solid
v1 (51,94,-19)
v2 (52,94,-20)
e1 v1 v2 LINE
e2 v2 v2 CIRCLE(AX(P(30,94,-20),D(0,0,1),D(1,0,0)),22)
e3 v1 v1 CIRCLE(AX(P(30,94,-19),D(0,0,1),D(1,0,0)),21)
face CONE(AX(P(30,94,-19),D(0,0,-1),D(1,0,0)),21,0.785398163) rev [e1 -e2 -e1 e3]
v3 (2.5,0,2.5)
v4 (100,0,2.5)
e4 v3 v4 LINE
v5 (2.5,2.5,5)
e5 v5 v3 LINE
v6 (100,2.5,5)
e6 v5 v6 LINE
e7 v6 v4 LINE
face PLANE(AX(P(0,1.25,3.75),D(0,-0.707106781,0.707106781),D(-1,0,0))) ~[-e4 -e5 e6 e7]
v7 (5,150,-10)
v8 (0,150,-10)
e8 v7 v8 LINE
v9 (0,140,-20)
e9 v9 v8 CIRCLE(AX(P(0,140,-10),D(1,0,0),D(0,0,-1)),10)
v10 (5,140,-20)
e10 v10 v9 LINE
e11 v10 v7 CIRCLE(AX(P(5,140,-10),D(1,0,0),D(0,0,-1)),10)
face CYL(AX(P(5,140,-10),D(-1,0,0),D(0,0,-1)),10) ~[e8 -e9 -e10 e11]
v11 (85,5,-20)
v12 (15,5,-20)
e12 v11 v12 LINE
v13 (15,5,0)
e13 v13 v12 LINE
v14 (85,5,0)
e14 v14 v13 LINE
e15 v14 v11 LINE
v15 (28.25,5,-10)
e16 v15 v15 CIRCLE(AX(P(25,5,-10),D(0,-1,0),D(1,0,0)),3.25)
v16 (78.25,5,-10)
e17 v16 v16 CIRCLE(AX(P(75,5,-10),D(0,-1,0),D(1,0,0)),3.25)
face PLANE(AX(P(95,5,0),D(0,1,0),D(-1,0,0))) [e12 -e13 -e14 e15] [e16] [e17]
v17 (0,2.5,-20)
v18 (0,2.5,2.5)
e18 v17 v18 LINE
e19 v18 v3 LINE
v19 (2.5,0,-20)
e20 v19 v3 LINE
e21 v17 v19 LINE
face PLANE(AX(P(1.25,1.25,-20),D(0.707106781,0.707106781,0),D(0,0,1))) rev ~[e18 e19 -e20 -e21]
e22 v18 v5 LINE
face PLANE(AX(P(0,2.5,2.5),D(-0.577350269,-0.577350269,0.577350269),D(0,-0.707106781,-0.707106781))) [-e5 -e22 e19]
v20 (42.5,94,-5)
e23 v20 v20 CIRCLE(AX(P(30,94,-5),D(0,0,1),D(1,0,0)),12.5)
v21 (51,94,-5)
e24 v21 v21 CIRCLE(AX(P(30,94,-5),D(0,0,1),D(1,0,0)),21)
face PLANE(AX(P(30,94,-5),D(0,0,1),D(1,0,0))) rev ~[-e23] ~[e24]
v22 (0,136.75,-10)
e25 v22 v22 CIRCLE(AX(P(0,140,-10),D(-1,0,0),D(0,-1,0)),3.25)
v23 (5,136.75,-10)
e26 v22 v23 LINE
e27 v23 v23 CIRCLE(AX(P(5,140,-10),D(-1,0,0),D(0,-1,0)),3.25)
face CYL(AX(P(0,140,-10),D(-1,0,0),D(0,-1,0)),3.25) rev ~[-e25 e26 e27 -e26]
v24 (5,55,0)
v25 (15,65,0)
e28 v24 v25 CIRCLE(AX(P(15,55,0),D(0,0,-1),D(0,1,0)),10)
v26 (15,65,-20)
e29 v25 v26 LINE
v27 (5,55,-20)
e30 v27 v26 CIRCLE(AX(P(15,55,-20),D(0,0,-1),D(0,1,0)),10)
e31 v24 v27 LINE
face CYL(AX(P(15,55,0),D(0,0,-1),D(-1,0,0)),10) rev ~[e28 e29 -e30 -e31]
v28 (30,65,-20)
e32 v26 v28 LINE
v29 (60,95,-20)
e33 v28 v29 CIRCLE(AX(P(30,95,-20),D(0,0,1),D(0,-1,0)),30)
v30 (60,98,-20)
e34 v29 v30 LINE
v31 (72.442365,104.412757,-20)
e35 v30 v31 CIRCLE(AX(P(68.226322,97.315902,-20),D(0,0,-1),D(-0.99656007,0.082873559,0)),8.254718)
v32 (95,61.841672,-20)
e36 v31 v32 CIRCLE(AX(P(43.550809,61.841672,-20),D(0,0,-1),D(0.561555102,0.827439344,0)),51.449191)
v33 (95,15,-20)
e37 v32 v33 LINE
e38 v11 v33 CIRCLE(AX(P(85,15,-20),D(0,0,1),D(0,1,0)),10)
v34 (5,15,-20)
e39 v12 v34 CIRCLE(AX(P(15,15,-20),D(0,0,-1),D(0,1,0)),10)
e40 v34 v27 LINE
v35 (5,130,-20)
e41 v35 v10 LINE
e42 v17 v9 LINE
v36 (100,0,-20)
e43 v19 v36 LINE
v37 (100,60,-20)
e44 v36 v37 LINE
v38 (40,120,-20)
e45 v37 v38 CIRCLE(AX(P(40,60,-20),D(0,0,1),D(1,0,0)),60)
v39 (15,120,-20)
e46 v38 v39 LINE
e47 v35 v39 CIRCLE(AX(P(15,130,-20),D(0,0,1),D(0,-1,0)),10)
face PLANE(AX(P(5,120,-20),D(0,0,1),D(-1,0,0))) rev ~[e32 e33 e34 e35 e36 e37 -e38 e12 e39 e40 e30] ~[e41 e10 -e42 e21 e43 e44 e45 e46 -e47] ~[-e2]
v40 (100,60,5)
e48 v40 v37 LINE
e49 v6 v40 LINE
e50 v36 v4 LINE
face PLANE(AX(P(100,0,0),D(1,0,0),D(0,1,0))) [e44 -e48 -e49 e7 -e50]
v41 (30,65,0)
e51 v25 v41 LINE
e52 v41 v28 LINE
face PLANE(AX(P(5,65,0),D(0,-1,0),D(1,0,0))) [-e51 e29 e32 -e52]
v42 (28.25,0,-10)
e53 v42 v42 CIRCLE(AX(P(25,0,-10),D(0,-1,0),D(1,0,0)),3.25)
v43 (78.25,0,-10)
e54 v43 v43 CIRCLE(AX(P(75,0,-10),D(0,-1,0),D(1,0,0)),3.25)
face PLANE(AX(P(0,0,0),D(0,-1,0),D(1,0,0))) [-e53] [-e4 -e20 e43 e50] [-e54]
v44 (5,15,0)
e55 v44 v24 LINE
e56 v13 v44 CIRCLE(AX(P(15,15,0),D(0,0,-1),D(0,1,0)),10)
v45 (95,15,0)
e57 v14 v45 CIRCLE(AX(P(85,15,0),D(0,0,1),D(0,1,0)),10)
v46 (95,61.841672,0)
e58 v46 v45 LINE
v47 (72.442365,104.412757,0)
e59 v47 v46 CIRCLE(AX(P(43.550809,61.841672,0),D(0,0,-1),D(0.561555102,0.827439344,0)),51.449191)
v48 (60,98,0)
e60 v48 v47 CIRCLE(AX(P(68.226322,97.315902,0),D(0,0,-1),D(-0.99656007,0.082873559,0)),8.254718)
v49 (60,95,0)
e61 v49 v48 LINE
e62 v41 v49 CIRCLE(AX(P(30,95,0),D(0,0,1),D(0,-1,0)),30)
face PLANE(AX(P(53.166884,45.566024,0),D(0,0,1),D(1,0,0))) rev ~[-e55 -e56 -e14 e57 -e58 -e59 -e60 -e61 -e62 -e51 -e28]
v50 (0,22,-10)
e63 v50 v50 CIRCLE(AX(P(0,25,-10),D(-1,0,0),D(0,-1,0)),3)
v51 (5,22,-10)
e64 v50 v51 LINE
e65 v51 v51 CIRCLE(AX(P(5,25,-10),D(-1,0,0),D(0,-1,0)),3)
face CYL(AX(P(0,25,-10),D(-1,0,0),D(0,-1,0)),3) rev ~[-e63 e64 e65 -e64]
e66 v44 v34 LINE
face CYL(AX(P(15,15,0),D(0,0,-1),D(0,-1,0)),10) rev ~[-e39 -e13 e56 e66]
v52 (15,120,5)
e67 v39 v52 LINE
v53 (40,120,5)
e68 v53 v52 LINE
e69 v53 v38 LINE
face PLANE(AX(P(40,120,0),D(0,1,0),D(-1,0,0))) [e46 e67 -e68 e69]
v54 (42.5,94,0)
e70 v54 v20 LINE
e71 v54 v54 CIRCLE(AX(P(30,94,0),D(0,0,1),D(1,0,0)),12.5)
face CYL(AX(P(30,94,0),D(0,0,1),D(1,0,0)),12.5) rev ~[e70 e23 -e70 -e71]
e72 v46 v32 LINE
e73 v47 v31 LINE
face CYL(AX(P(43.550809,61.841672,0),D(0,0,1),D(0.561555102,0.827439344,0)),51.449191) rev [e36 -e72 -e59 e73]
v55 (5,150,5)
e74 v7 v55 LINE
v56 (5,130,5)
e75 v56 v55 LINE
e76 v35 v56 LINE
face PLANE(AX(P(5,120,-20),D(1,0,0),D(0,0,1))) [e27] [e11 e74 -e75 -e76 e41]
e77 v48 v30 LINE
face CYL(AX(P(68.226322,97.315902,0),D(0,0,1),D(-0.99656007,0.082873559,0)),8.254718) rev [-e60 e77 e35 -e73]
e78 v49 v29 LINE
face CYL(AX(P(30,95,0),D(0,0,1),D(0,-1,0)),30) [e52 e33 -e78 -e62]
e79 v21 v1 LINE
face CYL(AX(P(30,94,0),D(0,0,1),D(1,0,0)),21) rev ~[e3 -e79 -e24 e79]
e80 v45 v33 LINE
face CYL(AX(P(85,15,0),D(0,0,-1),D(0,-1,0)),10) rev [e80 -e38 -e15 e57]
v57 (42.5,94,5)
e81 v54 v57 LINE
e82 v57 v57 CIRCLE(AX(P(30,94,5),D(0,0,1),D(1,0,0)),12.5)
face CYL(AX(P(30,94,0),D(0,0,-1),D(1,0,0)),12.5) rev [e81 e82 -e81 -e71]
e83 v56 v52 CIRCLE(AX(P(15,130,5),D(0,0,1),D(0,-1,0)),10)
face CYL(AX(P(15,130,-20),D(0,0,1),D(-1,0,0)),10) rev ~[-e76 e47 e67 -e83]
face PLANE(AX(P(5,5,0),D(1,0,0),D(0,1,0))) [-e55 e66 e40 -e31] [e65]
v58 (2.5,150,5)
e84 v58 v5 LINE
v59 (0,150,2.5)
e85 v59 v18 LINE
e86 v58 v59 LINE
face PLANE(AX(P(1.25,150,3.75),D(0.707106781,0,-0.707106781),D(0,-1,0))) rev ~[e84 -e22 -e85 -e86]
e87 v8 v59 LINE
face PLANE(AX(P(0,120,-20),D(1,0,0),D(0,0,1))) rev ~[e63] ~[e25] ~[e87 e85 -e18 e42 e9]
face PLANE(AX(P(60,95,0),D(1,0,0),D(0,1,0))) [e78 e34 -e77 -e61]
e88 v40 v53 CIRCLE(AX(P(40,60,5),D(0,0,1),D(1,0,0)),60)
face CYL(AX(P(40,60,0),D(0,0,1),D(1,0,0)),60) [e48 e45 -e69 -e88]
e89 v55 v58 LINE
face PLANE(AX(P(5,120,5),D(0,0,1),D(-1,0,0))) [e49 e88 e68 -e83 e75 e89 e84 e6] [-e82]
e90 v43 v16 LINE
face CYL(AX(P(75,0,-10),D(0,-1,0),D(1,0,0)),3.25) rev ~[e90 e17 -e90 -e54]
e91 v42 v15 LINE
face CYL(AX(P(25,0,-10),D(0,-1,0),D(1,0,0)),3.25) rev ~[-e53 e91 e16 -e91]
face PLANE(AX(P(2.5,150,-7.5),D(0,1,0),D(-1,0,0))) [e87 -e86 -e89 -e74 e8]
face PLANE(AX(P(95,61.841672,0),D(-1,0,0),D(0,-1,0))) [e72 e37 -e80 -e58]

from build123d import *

# Parameters (mm, degrees)
F0_R      = 21
F0_R_2    = 12.5
F1_DEPTH  = 5
F2_DEPTH  = 20
F3_W      = 5
F3_H      = 25
F4_DEPTH  = 30
F6_R      = 3.25
F7_DEPTH  = 25
F5_R      = 3
F5_R_2    = 3.25
F8_DEPTH  = 25
F9_SIZE   = 2.5
F10_R     = 10
F11_DEPTH = 5
F12_SIZE  = 1


# Not quite as in the source:
# - a feature names something its author has since deleted; it is built from what else it names


with BuildPart() as f1:
    # F0 (on Top) → F1 (new body)
    with BuildSketch(Plane.XY):
        with BuildLine():
            Line((30, 65), (5, 65))
            Line((5, 65), (5, 5))
            Line((5, 5), (95, 5))
            Line((95, 5), (95, 61.8416720113))
            ThreePointArc((95, 61.8416720113), (89.0121465356, 85.9307991151), (72.4423646792, 104.4127568838))
            ThreePointArc((72.4423646792, 104.4127568838), (64.4445964825, 104.6534027902), (60, 98))
            Line((60, 98), (60, 95))
            ThreePointArc((60, 95), (51.2132034356, 73.7867965644), (30, 65))
        make_face()
        with BuildLine():
            Line((40, 120), (5, 120))
            Line((5, 120), (5, 65))
            Line((5, 65), (30, 65))
            ThreePointArc((30, 65), (51.2132034356, 73.7867965644), (60, 95))
            Line((60, 95), (60, 98))
            ThreePointArc((60, 98), (64.4445964825, 104.6534027902), (72.4423646792, 104.4127568838))
            ThreePointArc((72.4423646792, 104.4127568838), (89.0121465356, 85.9307991151), (95, 61.8416720113))
            Line((95, 61.8416720113), (95, 5))
            Line((95, 5), (100, 5))
            Line((100, 5), (100, 60))
            ThreePointArc((100, 60), (82.4264068712, 102.4264068712), (40, 120))
        make_face()
        with Locations((30, 94)):
            Circle(F0_R, mode=Mode.SUBTRACT)
        with Locations((30, 94)):
            Circle(F0_R)
        with Locations((30, 94)):
            Circle(F0_R_2, mode=Mode.SUBTRACT)
        Polygon((0, 120), (0, 0), (100, 0), (100, 5), (95, 5), (5, 5), (5, 65), (5, 120), align=None)
    extrude(amount=F1_DEPTH)

    # F0 (on Top) → F2 (join)
    with BuildSketch(Plane.XY):
        Polygon((0, 120), (0, 0), (100, 0), (100, 5), (95, 5), (5, 5), (5, 65), (5, 120), align=None)
        with BuildLine():
            Line((40, 120), (5, 120))
            Line((5, 120), (5, 65))
            Line((5, 65), (30, 65))
            ThreePointArc((30, 65), (51.2132034356, 73.7867965644), (60, 95))
            Line((60, 95), (60, 98))
            ThreePointArc((60, 98), (64.4445964825, 104.6534027902), (72.4423646792, 104.4127568838))
            ThreePointArc((72.4423646792, 104.4127568838), (89.0121465356, 85.9307991151), (95, 61.8416720113))
            Line((95, 61.8416720113), (95, 5))
            Line((95, 5), (100, 5))
            Line((100, 5), (100, 60))
            ThreePointArc((100, 60), (82.4264068712, 102.4264068712), (40, 120))
        make_face()
        with Locations((30, 94)):
            Circle(F0_R, mode=Mode.SUBTRACT)
    extrude(amount=-F2_DEPTH)

    # F3 (on face) → F4 (join)
    with BuildSketch(Plane(origin=(0, 120, 0), x_dir=(-1, 0, 0), z_dir=(0, 1, 0))):
        with Locations((-2.5, -7.5)):
            Rectangle(F3_W, F3_H)
    extrude(amount=F4_DEPTH)

    # F6 (on face) → F7 (cut)
    with BuildSketch(Plane.XZ):
        with Locations((25, -10)):
            Circle(F6_R)
        with Locations((75, -10)):
            Circle(F6_R)
    extrude(amount=-F7_DEPTH, mode=Mode.SUBTRACT)

    # F5 (on face) → F8 (cut)
    with BuildSketch(Plane(origin=(0, 0, 0), x_dir=(0, -1, 0), z_dir=(-1, 0, 0))):
        with Locations((-25, -10)):
            Circle(F5_R)
        with Locations((-140, -10)):
            Circle(F5_R_2)
    extrude(amount=-F8_DEPTH, mode=Mode.SUBTRACT)

    # F9
    f9_edges = [f1.edges().sort_by_distance(p)[0] for p in [
        (50, 0, 5),
        (0, 75, 5),
        (0, 0, -7.5),
    ]]
    chamfer(f9_edges, length=F9_SIZE)

    # F10
    f10_edges = [f1.edges().sort_by_distance(p)[0] for p in [
        (5, 5, -10),
        (95, 5, -10),
        (5, 65, -10),
        (5, 120, -7.5),
        (2.5, 150, -20),
    ]]
    fillet(f10_edges, radius=F10_R)

    # F0 (on Top) → F11 (join)
    with BuildSketch(Plane.XY):
        with Locations((30, 94)):
            Circle(F0_R)
        with Locations((30, 94)):
            Circle(F0_R_2, mode=Mode.SUBTRACT)
    extrude(amount=-F11_DEPTH)

    # F12
    f12_edges = [f1.edges().sort_by_distance(p)[0] for p in [
        (9, 94, -20),
    ]]
    chamfer(f12_edges, length=F12_SIZE)


solid = f1.part
